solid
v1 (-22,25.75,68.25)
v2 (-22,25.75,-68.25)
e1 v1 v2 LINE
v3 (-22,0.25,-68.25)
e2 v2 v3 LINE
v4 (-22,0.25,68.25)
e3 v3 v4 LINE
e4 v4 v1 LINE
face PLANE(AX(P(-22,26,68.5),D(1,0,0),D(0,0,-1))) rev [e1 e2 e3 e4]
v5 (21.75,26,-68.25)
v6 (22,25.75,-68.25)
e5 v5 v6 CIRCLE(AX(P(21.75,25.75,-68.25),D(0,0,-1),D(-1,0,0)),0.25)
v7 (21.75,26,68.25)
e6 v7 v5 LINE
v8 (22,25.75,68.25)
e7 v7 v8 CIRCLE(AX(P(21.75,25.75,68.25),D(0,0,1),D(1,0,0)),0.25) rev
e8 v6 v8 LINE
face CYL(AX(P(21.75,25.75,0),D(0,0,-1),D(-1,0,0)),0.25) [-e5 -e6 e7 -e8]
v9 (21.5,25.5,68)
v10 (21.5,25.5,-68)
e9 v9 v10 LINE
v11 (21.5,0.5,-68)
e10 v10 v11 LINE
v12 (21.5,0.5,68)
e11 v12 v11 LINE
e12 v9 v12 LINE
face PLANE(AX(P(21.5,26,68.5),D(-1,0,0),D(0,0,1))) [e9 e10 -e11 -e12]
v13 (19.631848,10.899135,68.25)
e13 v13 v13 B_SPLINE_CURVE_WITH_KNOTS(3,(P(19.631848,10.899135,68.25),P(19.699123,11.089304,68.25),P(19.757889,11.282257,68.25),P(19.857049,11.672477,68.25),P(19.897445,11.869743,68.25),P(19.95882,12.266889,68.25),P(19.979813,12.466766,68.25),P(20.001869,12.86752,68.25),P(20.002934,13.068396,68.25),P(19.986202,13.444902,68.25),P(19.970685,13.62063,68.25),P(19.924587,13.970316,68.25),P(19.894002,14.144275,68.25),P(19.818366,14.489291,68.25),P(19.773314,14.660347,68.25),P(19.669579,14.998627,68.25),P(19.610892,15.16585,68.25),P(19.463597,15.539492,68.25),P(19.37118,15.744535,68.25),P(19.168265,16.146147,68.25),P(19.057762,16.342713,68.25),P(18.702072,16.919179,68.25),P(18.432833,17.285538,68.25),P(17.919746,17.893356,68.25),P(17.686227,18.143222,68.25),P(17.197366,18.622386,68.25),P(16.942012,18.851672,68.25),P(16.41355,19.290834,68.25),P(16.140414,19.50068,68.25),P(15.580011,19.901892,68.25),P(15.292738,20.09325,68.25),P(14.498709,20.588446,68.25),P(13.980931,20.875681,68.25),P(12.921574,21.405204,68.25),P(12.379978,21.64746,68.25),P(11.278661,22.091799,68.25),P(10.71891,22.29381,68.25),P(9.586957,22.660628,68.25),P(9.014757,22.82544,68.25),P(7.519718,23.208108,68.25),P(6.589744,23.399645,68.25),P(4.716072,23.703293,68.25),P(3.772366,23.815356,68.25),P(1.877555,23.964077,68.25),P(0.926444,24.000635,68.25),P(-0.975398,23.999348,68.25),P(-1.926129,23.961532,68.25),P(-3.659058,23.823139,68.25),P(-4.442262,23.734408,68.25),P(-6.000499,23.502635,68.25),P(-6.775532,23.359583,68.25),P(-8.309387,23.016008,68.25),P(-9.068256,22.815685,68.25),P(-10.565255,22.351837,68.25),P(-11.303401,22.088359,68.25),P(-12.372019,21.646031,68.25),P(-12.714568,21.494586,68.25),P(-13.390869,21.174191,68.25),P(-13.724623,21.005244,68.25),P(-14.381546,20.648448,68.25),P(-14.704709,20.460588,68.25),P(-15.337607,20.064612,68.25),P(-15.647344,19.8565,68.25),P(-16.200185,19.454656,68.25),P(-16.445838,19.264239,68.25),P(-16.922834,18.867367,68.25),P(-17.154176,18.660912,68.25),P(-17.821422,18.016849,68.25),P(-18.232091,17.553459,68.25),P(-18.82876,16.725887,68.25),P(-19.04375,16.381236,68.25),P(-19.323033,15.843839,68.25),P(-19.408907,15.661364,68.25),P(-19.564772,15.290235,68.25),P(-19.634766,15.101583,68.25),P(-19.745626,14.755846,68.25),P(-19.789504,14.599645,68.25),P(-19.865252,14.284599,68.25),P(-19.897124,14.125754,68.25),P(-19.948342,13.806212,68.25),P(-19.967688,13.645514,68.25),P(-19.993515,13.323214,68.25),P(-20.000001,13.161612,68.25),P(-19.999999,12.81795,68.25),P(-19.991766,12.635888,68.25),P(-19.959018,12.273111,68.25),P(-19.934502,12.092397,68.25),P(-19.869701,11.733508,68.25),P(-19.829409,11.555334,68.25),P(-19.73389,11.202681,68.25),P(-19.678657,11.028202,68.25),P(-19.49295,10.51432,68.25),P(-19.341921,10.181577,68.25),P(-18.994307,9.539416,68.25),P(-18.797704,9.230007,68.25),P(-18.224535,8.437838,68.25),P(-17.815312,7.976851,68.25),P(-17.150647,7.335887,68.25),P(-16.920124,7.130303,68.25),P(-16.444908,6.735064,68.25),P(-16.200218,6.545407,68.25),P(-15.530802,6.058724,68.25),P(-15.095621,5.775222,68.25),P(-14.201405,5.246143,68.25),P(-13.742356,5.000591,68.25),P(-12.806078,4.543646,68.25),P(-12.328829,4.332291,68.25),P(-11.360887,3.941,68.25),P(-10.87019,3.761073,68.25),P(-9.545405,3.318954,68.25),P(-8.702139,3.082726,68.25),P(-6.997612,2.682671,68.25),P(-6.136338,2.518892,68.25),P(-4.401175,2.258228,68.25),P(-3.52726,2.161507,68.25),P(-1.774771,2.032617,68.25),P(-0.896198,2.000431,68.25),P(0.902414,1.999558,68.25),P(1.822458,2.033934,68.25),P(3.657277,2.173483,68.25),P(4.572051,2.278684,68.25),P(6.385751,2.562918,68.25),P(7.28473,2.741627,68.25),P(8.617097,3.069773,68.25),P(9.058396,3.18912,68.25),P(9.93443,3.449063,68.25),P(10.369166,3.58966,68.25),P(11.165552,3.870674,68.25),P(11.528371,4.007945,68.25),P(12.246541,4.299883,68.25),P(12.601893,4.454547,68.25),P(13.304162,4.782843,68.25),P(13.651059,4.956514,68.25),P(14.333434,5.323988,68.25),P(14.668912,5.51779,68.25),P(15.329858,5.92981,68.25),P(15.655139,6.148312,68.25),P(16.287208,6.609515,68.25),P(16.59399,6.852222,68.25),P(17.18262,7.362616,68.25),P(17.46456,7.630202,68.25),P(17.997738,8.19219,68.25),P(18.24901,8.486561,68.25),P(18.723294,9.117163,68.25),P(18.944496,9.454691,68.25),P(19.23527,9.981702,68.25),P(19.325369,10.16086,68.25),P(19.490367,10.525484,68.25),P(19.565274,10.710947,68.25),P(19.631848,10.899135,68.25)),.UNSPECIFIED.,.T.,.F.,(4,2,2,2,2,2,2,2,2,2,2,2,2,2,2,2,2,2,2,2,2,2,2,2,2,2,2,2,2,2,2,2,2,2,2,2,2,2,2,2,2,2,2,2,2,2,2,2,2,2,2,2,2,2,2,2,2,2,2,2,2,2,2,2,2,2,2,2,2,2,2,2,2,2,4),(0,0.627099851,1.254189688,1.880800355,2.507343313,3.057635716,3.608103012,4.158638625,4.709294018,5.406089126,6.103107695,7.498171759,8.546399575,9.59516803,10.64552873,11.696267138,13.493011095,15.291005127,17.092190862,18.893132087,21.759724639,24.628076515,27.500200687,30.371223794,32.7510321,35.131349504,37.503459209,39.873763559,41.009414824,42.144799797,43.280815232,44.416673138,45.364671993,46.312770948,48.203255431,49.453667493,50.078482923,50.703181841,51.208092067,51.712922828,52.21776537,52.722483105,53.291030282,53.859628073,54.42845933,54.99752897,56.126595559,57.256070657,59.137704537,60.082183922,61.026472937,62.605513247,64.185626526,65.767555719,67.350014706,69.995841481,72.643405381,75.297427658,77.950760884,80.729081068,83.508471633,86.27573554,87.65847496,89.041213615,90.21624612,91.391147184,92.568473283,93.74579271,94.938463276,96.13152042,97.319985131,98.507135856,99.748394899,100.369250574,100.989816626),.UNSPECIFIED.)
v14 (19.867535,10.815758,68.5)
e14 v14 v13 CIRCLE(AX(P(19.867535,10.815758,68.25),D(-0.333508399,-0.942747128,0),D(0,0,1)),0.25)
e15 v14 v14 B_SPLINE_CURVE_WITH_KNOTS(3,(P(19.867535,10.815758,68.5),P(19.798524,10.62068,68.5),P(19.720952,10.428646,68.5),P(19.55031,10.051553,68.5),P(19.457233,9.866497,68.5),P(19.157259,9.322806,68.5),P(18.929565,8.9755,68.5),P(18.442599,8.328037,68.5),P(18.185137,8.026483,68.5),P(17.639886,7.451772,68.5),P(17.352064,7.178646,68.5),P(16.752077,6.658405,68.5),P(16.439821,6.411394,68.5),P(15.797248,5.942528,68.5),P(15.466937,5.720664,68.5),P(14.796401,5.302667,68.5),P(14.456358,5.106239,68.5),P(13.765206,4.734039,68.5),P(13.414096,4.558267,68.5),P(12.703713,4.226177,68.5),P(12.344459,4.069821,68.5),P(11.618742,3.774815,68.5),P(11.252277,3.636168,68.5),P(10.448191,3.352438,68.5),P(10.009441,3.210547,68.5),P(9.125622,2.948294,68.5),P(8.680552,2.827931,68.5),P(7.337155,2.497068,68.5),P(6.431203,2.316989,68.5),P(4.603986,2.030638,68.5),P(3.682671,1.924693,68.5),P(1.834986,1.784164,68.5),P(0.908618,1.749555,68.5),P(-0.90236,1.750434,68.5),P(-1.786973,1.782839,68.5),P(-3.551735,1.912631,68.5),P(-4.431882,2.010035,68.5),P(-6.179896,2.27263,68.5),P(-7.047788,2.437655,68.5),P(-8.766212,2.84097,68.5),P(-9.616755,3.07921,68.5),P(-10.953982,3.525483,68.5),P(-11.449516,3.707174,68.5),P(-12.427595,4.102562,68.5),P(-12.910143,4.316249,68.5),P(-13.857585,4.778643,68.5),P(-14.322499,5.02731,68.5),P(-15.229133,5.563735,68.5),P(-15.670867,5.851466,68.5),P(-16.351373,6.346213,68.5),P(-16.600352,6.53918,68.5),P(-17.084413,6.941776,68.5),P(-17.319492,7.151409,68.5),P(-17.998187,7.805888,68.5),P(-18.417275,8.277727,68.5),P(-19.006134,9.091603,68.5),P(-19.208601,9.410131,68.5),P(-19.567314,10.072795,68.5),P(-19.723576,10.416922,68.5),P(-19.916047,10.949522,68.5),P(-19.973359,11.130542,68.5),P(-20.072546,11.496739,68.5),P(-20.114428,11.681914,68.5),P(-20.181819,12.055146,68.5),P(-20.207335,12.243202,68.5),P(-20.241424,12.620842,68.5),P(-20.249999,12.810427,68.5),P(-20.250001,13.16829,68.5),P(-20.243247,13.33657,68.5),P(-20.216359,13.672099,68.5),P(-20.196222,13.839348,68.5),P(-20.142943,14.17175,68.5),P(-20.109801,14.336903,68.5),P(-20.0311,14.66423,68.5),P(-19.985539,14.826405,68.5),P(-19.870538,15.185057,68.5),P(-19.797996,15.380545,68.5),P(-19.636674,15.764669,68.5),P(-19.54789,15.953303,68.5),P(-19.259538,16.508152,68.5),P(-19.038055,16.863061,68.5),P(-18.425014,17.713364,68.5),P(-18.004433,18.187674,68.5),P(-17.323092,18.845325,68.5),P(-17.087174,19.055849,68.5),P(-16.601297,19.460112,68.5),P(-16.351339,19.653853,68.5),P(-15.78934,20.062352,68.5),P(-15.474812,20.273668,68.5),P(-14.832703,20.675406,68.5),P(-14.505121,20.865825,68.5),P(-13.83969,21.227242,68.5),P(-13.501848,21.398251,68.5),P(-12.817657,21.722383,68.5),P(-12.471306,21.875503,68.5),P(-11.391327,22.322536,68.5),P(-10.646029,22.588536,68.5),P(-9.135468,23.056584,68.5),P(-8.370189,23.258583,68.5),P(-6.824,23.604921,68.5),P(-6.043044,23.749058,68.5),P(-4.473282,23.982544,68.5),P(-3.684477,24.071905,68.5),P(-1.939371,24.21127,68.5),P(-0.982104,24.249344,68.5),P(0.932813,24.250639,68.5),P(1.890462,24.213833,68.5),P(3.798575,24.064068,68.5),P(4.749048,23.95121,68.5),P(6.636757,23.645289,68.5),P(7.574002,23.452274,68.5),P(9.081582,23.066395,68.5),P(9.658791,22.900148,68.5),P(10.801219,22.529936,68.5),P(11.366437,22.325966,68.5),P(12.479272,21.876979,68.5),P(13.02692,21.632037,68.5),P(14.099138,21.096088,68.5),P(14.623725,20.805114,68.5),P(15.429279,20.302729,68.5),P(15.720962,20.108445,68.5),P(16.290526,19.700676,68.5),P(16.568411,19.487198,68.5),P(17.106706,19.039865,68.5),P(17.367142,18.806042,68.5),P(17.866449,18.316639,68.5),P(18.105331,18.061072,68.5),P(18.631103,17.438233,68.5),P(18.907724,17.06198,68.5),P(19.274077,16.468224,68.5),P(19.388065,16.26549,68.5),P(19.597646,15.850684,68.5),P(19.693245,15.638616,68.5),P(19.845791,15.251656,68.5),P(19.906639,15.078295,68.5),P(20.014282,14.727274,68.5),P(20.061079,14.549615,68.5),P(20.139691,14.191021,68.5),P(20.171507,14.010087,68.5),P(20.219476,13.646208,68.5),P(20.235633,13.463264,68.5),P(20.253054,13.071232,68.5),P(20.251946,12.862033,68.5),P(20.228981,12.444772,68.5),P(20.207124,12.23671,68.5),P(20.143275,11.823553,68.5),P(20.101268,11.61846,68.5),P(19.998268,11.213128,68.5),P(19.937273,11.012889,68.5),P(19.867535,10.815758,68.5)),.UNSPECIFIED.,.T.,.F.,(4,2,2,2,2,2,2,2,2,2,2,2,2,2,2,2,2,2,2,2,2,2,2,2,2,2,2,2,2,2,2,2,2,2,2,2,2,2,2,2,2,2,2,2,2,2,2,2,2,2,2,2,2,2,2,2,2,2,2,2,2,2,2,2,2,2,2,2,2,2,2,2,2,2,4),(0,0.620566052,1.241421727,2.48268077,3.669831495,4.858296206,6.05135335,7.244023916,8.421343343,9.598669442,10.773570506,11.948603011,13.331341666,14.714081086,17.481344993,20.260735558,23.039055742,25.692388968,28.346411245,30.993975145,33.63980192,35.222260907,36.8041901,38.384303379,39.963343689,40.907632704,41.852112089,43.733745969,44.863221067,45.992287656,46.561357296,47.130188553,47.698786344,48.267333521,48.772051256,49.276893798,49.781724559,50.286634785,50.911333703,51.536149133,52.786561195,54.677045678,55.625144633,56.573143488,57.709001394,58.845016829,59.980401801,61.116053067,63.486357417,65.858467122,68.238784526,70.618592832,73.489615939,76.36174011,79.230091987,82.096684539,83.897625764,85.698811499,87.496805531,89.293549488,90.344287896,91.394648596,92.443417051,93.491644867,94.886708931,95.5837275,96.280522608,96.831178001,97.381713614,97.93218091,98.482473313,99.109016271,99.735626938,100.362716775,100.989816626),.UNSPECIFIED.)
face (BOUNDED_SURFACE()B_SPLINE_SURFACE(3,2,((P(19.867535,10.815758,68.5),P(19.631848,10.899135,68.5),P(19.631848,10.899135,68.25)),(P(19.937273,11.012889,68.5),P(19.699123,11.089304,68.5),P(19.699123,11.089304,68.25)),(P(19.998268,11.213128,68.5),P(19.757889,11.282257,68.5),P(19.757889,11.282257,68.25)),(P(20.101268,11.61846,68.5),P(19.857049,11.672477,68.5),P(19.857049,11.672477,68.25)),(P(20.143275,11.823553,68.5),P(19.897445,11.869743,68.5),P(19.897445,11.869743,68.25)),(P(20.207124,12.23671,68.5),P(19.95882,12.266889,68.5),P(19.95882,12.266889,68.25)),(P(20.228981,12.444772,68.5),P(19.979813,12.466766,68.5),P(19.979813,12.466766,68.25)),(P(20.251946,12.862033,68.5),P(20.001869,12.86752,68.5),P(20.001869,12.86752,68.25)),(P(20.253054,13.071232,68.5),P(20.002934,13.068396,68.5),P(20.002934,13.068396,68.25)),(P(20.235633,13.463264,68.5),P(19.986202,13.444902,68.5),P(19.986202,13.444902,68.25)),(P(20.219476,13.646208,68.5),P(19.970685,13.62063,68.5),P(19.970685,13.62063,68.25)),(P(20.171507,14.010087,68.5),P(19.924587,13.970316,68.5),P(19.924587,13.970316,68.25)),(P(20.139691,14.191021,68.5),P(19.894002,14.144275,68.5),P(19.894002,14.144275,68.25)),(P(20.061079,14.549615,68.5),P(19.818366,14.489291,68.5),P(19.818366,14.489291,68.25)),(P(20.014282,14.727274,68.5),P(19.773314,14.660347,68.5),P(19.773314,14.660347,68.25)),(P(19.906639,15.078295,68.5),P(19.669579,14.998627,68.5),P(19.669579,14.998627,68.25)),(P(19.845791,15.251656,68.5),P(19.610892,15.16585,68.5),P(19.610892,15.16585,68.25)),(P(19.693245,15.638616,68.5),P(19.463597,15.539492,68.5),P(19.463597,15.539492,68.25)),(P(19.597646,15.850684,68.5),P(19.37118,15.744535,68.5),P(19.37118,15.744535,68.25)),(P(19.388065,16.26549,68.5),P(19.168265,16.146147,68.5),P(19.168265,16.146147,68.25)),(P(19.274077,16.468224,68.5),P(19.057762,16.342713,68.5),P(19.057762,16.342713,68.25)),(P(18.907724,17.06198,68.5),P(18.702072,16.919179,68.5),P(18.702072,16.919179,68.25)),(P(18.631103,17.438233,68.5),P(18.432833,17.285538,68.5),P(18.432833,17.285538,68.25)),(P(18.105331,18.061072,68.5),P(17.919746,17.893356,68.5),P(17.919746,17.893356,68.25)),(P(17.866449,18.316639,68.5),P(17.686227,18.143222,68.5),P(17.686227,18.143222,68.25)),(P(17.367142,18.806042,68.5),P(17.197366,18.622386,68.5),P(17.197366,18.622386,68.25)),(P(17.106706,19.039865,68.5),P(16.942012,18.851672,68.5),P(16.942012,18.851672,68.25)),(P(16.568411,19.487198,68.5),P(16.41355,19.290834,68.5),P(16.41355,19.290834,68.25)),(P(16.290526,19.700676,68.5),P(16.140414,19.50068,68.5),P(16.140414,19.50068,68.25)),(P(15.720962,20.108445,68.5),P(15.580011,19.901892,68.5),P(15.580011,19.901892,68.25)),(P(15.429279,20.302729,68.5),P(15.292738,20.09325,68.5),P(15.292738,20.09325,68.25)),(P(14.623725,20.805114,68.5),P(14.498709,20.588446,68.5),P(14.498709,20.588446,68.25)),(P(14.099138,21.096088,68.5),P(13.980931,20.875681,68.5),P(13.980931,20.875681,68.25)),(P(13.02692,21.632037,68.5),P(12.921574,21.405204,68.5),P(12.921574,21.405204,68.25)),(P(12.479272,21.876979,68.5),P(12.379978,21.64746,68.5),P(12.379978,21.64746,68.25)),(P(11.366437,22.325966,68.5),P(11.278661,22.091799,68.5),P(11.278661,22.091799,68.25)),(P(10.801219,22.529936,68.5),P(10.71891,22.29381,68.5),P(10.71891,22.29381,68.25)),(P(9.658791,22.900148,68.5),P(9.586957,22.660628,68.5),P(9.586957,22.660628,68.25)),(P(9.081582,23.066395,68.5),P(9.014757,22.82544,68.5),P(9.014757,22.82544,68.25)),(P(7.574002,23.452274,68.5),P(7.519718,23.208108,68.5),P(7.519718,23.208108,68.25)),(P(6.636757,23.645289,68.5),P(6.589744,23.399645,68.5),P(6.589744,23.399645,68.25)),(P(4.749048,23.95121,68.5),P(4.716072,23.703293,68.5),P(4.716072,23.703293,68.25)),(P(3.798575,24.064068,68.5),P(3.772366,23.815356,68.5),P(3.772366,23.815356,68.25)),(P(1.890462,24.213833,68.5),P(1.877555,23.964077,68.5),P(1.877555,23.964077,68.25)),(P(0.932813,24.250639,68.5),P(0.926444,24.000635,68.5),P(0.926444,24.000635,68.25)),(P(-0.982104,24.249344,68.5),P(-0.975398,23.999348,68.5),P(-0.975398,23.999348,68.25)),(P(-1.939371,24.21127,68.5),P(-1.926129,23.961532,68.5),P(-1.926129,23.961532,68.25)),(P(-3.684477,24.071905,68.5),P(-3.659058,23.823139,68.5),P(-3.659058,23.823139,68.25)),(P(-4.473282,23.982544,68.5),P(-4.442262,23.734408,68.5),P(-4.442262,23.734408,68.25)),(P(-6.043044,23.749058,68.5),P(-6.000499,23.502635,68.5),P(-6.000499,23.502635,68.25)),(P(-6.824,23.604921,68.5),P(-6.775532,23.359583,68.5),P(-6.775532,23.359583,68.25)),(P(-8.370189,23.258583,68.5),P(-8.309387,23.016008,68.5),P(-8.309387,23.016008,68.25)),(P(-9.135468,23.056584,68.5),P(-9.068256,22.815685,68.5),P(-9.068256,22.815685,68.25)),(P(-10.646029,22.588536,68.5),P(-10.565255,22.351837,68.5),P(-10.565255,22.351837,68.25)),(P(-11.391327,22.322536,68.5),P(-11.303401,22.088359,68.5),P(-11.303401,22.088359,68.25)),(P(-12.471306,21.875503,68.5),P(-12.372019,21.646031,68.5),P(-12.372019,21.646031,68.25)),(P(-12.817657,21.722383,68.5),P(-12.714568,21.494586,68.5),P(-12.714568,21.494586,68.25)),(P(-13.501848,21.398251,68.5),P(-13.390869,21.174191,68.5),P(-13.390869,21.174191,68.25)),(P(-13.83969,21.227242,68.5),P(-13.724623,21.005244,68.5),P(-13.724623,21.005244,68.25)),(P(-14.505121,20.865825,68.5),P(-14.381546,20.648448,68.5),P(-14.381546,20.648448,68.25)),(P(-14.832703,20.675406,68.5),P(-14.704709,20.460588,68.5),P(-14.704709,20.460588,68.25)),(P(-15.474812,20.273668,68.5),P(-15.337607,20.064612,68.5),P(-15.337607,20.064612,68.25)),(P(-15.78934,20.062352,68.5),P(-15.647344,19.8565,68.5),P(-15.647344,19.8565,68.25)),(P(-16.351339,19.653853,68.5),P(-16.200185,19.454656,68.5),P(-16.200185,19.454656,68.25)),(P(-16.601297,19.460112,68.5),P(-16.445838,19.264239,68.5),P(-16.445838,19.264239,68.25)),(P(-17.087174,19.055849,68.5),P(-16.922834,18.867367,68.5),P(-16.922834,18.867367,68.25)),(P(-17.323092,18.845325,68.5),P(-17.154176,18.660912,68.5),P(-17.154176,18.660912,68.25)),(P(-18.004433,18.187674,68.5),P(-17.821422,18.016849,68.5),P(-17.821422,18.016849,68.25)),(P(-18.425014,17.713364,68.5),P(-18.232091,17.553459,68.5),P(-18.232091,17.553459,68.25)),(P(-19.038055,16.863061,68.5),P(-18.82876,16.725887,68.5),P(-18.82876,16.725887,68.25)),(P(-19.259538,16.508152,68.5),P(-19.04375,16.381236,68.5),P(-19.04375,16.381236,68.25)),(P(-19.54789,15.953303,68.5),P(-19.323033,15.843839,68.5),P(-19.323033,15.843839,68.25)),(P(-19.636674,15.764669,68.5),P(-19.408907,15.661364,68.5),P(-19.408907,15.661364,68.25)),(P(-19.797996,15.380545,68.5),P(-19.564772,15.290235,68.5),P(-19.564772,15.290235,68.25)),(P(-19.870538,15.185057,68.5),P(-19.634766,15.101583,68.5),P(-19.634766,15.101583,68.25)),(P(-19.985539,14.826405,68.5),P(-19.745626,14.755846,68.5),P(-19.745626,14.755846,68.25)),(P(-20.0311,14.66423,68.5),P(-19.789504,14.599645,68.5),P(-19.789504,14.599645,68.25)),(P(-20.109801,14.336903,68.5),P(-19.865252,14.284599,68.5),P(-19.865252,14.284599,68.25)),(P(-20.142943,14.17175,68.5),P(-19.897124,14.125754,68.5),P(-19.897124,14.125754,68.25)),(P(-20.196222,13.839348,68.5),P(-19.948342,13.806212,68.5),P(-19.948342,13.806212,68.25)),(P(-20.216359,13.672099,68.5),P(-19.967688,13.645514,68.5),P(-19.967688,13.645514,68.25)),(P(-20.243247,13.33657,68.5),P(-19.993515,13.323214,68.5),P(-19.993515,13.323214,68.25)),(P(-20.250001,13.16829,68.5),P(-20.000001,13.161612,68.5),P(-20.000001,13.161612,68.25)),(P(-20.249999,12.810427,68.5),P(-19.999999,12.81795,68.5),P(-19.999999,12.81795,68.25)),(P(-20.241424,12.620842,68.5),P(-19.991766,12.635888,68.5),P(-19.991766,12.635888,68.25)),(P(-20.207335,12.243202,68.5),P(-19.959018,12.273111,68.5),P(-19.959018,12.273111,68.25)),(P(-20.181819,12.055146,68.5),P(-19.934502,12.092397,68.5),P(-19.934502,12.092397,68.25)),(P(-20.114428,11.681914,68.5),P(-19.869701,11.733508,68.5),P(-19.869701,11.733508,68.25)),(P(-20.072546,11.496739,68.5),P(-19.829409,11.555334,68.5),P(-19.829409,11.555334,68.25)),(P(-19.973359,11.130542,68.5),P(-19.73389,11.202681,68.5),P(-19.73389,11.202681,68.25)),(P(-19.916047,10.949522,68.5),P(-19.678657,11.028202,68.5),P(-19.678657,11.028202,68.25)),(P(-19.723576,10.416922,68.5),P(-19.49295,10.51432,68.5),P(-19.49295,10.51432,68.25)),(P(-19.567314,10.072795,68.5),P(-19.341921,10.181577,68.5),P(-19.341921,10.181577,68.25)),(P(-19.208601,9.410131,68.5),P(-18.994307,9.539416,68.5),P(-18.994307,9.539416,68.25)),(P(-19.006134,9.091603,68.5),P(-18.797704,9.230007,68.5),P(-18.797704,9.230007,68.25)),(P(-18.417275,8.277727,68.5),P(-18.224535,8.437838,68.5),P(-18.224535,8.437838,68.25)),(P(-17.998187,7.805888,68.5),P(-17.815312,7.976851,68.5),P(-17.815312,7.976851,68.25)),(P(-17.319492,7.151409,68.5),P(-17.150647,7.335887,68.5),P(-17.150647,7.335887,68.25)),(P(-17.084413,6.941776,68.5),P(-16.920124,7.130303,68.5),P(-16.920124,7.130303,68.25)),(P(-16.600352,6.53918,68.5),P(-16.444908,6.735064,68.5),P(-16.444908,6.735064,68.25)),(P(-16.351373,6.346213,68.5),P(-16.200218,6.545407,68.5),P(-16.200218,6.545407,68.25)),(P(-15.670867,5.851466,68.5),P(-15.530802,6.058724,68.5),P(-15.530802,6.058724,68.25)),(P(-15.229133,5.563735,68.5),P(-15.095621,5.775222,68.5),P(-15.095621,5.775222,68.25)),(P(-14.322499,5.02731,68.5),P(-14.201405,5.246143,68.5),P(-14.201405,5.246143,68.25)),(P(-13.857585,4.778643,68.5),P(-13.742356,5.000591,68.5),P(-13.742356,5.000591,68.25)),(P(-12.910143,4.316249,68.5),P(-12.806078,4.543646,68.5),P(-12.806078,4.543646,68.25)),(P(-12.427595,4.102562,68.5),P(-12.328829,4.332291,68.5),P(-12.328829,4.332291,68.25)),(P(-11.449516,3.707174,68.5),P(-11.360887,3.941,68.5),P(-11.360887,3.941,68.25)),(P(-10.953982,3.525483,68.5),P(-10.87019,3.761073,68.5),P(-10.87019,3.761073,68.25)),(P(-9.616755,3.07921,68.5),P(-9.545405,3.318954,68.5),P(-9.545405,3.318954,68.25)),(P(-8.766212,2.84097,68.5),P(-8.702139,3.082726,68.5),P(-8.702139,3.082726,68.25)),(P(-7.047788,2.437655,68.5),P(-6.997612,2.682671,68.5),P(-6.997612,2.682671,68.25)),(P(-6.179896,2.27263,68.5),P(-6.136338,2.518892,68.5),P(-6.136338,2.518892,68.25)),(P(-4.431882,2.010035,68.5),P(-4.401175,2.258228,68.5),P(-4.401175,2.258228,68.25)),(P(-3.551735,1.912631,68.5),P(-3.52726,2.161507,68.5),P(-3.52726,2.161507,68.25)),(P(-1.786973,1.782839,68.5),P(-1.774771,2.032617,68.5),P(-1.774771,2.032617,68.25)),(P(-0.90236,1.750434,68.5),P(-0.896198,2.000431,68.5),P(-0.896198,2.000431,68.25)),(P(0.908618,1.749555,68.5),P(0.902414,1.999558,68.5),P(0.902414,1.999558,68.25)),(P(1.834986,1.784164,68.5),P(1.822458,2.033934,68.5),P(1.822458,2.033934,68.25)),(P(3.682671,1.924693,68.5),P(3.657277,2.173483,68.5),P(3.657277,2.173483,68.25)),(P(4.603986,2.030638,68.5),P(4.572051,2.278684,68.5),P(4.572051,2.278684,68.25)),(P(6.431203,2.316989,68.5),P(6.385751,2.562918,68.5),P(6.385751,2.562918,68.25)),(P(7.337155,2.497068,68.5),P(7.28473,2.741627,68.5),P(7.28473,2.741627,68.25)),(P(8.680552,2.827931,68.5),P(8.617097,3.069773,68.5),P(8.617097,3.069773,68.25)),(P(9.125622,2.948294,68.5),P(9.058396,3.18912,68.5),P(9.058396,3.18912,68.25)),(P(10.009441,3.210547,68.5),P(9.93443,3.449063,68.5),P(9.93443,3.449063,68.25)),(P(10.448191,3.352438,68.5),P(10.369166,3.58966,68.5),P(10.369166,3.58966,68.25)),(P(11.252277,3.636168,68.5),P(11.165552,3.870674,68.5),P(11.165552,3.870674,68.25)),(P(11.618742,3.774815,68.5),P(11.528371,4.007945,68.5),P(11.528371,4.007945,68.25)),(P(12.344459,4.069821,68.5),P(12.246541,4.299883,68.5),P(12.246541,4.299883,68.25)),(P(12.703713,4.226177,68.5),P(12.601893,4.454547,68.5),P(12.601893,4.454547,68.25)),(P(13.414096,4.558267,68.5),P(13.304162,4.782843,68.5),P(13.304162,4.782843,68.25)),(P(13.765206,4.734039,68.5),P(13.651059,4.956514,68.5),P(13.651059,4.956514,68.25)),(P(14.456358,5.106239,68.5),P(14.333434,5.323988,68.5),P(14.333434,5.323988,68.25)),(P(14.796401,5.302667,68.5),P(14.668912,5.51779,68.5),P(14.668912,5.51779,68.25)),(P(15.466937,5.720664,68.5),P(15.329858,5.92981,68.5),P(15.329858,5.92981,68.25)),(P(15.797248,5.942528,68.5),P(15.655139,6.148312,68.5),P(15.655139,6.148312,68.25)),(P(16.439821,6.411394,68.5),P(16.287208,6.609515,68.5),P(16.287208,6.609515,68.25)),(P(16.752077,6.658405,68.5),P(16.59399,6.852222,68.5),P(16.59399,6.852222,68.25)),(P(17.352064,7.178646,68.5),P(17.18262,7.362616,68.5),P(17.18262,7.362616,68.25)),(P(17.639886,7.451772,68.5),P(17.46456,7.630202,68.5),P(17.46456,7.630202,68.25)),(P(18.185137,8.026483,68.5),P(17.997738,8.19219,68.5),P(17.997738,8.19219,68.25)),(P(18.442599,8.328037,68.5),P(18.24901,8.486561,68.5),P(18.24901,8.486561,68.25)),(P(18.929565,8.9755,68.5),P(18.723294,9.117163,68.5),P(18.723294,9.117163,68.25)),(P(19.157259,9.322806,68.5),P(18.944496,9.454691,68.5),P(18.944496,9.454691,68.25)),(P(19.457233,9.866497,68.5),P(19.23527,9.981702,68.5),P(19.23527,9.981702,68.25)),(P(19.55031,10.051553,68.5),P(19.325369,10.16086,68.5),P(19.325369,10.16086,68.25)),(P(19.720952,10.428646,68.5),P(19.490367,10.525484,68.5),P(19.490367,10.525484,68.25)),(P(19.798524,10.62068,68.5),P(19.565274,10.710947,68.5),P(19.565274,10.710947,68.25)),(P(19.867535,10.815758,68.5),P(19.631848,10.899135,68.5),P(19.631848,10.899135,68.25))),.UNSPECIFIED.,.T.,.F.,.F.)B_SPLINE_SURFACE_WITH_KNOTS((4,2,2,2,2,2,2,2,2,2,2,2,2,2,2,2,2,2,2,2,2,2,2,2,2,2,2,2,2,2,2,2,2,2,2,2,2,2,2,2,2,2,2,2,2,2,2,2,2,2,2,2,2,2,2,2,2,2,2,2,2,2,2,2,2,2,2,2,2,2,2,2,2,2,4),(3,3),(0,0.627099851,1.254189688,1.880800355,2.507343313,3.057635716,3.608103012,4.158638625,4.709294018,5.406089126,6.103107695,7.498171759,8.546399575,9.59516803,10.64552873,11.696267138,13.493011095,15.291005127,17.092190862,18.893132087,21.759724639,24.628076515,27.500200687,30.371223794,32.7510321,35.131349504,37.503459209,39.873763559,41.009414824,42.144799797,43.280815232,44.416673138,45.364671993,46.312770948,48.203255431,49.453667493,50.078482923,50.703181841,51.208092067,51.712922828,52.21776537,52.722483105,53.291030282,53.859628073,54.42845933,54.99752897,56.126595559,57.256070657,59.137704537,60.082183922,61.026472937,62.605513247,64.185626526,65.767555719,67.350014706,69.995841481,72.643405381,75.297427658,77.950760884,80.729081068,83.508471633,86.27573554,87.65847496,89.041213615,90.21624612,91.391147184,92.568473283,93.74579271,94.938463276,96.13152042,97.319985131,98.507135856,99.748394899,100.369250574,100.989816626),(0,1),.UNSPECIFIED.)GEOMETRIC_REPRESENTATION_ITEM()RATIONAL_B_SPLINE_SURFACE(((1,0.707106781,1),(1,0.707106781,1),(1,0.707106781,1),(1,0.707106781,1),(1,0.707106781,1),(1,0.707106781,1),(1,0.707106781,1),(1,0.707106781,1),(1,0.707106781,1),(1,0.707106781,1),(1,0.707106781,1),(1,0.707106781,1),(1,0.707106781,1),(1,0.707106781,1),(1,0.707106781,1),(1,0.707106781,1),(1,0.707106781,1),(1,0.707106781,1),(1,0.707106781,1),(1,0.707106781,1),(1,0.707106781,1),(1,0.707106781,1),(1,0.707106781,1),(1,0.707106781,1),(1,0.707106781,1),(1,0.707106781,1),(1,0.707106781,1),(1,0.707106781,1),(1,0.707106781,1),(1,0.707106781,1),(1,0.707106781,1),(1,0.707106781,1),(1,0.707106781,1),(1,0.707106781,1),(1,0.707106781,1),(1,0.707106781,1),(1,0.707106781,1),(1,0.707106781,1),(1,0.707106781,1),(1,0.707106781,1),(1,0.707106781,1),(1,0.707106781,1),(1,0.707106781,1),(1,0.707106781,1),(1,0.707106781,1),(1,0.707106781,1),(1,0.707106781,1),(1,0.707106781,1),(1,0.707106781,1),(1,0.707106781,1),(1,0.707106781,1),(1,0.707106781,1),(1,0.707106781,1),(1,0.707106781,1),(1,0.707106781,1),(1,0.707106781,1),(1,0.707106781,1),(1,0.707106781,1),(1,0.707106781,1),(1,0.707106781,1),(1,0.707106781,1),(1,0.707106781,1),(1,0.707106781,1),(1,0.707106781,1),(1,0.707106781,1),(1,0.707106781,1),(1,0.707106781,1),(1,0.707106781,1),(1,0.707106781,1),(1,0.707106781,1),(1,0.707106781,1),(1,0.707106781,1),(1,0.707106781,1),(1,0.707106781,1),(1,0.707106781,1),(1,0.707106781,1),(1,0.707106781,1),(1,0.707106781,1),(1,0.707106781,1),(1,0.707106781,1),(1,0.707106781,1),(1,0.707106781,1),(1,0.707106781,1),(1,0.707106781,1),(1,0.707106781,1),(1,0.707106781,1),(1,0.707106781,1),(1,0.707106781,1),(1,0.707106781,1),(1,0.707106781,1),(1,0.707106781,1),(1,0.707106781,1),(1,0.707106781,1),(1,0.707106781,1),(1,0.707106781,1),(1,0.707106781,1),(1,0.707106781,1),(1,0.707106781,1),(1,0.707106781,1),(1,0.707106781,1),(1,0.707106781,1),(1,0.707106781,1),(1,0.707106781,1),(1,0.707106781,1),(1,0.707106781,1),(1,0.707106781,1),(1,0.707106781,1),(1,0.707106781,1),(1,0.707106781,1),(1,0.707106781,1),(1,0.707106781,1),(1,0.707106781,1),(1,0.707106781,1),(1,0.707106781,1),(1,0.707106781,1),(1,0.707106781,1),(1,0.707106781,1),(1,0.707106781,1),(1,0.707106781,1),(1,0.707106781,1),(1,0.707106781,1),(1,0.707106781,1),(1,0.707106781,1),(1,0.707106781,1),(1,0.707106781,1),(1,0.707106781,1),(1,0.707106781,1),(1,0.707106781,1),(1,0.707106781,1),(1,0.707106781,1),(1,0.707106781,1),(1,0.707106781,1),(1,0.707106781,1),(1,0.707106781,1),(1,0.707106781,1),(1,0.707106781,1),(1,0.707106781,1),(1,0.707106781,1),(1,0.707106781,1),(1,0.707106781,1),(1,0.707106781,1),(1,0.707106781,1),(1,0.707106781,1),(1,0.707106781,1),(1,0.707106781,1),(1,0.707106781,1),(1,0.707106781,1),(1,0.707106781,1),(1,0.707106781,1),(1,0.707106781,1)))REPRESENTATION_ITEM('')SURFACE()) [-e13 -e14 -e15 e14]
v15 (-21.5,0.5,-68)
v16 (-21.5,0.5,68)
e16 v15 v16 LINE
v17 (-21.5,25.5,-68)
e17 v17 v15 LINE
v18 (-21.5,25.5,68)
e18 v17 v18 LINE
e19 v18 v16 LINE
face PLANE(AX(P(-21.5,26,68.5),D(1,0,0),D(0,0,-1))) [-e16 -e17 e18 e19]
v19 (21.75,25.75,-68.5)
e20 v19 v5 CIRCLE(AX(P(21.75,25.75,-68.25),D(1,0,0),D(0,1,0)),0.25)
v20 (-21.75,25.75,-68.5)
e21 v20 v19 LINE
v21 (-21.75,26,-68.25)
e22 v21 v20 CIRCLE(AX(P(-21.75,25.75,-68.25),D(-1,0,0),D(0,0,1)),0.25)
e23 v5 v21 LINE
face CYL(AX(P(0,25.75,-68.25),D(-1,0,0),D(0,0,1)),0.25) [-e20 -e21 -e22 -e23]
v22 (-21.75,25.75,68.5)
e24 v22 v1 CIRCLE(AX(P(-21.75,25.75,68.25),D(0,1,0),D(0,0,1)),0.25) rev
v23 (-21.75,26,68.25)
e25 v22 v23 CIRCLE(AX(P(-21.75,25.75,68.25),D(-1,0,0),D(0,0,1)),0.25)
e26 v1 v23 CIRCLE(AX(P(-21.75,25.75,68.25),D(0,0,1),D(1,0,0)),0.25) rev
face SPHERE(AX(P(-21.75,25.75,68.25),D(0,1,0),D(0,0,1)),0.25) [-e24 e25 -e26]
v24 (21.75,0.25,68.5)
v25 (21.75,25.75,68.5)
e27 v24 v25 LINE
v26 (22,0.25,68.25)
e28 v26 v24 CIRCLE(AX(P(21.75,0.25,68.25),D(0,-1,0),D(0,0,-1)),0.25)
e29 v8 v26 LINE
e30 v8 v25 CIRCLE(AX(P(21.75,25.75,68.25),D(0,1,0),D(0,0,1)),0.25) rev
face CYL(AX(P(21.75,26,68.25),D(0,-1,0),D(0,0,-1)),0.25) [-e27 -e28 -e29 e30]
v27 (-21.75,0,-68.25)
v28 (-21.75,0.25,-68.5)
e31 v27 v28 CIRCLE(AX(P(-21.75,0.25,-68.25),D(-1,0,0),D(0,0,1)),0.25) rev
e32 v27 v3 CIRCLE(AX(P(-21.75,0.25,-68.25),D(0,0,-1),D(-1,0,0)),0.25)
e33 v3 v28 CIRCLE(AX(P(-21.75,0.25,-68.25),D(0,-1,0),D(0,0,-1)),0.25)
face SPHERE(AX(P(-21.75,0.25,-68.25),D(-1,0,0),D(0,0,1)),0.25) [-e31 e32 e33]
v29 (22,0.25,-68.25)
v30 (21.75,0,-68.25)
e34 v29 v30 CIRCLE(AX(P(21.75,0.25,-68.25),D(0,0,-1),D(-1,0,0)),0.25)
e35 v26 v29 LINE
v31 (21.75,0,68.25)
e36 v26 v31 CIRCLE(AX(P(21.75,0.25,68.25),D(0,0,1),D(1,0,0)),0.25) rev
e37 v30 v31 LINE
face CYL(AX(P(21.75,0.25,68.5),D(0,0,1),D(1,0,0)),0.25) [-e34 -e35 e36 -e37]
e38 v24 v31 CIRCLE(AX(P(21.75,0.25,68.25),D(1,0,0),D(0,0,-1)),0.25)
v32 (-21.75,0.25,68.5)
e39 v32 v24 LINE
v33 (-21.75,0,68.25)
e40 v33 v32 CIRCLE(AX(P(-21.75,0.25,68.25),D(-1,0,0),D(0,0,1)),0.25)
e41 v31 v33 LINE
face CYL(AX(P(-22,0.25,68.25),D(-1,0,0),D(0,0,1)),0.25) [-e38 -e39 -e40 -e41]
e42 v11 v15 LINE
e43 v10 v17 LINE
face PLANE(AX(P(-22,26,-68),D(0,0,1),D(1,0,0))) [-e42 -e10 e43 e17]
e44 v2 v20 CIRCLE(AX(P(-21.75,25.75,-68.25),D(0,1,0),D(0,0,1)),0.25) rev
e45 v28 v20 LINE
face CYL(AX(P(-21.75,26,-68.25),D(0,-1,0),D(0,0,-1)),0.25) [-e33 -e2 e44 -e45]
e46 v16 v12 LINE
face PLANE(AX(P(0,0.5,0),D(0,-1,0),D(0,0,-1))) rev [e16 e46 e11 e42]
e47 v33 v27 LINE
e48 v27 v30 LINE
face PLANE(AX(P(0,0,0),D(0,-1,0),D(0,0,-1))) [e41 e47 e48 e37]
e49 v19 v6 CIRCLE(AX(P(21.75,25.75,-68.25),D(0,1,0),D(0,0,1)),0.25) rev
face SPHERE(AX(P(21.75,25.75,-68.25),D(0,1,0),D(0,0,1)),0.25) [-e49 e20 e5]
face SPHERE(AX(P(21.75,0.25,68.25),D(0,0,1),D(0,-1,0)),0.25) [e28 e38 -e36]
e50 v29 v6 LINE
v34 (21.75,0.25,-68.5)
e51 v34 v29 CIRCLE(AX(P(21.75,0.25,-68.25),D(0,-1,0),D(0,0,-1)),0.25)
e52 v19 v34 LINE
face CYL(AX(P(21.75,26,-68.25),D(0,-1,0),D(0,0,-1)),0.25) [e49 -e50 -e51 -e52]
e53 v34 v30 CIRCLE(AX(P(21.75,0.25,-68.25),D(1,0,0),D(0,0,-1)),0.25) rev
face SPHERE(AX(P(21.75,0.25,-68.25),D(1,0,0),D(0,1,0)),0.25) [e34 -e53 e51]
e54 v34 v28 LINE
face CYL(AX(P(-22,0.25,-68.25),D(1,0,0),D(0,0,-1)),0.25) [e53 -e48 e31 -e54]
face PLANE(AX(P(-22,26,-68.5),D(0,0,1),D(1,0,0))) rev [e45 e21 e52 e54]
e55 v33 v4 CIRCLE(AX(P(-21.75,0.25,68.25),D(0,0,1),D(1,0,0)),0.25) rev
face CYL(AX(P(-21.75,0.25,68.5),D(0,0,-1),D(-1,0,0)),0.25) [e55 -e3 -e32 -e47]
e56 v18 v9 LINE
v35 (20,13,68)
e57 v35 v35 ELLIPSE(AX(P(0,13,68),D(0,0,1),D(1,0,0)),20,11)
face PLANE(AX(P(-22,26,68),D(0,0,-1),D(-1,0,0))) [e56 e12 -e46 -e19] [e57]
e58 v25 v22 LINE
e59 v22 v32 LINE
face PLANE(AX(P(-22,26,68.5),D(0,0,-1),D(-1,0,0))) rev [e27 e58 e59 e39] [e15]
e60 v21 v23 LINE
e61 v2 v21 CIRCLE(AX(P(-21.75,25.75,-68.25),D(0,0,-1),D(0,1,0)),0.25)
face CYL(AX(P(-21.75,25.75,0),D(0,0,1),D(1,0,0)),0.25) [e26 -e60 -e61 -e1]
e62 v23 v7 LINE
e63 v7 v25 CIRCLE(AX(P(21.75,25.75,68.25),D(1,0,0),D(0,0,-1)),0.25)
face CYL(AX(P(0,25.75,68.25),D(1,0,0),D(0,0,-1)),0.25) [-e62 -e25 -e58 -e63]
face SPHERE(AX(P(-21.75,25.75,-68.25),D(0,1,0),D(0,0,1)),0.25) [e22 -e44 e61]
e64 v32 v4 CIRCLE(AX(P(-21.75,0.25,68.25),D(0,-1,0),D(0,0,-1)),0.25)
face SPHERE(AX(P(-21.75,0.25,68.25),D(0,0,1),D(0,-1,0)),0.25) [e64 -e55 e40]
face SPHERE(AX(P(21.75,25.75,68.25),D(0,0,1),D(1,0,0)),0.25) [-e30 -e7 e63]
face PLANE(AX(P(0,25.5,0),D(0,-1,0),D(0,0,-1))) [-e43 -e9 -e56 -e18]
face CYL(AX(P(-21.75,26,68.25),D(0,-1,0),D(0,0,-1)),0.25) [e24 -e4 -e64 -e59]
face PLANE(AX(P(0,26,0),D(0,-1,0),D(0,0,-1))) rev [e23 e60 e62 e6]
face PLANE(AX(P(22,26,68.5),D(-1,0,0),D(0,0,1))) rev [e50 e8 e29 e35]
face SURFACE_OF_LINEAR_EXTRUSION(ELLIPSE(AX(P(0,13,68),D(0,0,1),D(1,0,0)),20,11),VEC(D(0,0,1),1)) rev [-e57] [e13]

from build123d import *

# Parameters (mm, degrees)
SKETCH1_W           = 44
SKETCH1_H           = 137
BOSS_EXTRUDE1_DEPTH = 26
SKETCH2_RX          = 20
SKETCH2_RY          = 11
CUT_EXTRUDE1_DEPTH  = 0.5
SHELL1_START        = -68
SHELL1_OUTLINE_W    = 43
SHELL1_OUTLINE_H    = 25
SHELL1_DEPTH        = 136
FILLET1_R           = 0.25


# Read off the part's stored shape, not the designer's step: Shell1
with BuildPart() as part:
    # Sketch1 → Boss-Extrude1 (new body)
    with BuildSketch(Plane(origin=(0, 0, 0), x_dir=(1, 0, 0), z_dir=(0, 1, 0))):
        Rectangle(SKETCH1_W, SKETCH1_H)
    extrude(amount=BOSS_EXTRUDE1_DEPTH)

    # Sketch2 → Cut-Extrude1 (cut)
    with BuildSketch(Plane.XY.offset(68.5)):
        with Locations((0, 13)):
            Ellipse(SKETCH2_RX, SKETCH2_RY)
    extrude(amount=-CUT_EXTRUDE1_DEPTH, mode=Mode.SUBTRACT)

    # Shell1 outline → Shell1 (cut)
    with BuildSketch(Plane.XY.offset(SHELL1_START)):
        with Locations((0, 13)):
            Rectangle(SHELL1_OUTLINE_W, SHELL1_OUTLINE_H)
    extrude(amount=SHELL1_DEPTH, mode=Mode.SUBTRACT)

    # Fillet1
    fillet1_edges = [part.edges().sort_by_distance(p)[0] for p in [
        (-22, 26, 0),
        (-19.999850375, 12.957450604, 68.5),
        (0, 26, 68.5),
        (22, 26, 0),
        (0, 0, 68.5),
        (-22, 0, 0),
        (0, 0, -68.5),
        (22, 0, 0),
        (22, 13, 68.5),
        (-22, 13, 68.5),
        (-22, 13, -68.5),
        (22, 13, -68.5),
        (0, 26, -68.5),
    ]]
    fillet(fillet1_edges, radius=FILLET1_R)


solid = part.part
